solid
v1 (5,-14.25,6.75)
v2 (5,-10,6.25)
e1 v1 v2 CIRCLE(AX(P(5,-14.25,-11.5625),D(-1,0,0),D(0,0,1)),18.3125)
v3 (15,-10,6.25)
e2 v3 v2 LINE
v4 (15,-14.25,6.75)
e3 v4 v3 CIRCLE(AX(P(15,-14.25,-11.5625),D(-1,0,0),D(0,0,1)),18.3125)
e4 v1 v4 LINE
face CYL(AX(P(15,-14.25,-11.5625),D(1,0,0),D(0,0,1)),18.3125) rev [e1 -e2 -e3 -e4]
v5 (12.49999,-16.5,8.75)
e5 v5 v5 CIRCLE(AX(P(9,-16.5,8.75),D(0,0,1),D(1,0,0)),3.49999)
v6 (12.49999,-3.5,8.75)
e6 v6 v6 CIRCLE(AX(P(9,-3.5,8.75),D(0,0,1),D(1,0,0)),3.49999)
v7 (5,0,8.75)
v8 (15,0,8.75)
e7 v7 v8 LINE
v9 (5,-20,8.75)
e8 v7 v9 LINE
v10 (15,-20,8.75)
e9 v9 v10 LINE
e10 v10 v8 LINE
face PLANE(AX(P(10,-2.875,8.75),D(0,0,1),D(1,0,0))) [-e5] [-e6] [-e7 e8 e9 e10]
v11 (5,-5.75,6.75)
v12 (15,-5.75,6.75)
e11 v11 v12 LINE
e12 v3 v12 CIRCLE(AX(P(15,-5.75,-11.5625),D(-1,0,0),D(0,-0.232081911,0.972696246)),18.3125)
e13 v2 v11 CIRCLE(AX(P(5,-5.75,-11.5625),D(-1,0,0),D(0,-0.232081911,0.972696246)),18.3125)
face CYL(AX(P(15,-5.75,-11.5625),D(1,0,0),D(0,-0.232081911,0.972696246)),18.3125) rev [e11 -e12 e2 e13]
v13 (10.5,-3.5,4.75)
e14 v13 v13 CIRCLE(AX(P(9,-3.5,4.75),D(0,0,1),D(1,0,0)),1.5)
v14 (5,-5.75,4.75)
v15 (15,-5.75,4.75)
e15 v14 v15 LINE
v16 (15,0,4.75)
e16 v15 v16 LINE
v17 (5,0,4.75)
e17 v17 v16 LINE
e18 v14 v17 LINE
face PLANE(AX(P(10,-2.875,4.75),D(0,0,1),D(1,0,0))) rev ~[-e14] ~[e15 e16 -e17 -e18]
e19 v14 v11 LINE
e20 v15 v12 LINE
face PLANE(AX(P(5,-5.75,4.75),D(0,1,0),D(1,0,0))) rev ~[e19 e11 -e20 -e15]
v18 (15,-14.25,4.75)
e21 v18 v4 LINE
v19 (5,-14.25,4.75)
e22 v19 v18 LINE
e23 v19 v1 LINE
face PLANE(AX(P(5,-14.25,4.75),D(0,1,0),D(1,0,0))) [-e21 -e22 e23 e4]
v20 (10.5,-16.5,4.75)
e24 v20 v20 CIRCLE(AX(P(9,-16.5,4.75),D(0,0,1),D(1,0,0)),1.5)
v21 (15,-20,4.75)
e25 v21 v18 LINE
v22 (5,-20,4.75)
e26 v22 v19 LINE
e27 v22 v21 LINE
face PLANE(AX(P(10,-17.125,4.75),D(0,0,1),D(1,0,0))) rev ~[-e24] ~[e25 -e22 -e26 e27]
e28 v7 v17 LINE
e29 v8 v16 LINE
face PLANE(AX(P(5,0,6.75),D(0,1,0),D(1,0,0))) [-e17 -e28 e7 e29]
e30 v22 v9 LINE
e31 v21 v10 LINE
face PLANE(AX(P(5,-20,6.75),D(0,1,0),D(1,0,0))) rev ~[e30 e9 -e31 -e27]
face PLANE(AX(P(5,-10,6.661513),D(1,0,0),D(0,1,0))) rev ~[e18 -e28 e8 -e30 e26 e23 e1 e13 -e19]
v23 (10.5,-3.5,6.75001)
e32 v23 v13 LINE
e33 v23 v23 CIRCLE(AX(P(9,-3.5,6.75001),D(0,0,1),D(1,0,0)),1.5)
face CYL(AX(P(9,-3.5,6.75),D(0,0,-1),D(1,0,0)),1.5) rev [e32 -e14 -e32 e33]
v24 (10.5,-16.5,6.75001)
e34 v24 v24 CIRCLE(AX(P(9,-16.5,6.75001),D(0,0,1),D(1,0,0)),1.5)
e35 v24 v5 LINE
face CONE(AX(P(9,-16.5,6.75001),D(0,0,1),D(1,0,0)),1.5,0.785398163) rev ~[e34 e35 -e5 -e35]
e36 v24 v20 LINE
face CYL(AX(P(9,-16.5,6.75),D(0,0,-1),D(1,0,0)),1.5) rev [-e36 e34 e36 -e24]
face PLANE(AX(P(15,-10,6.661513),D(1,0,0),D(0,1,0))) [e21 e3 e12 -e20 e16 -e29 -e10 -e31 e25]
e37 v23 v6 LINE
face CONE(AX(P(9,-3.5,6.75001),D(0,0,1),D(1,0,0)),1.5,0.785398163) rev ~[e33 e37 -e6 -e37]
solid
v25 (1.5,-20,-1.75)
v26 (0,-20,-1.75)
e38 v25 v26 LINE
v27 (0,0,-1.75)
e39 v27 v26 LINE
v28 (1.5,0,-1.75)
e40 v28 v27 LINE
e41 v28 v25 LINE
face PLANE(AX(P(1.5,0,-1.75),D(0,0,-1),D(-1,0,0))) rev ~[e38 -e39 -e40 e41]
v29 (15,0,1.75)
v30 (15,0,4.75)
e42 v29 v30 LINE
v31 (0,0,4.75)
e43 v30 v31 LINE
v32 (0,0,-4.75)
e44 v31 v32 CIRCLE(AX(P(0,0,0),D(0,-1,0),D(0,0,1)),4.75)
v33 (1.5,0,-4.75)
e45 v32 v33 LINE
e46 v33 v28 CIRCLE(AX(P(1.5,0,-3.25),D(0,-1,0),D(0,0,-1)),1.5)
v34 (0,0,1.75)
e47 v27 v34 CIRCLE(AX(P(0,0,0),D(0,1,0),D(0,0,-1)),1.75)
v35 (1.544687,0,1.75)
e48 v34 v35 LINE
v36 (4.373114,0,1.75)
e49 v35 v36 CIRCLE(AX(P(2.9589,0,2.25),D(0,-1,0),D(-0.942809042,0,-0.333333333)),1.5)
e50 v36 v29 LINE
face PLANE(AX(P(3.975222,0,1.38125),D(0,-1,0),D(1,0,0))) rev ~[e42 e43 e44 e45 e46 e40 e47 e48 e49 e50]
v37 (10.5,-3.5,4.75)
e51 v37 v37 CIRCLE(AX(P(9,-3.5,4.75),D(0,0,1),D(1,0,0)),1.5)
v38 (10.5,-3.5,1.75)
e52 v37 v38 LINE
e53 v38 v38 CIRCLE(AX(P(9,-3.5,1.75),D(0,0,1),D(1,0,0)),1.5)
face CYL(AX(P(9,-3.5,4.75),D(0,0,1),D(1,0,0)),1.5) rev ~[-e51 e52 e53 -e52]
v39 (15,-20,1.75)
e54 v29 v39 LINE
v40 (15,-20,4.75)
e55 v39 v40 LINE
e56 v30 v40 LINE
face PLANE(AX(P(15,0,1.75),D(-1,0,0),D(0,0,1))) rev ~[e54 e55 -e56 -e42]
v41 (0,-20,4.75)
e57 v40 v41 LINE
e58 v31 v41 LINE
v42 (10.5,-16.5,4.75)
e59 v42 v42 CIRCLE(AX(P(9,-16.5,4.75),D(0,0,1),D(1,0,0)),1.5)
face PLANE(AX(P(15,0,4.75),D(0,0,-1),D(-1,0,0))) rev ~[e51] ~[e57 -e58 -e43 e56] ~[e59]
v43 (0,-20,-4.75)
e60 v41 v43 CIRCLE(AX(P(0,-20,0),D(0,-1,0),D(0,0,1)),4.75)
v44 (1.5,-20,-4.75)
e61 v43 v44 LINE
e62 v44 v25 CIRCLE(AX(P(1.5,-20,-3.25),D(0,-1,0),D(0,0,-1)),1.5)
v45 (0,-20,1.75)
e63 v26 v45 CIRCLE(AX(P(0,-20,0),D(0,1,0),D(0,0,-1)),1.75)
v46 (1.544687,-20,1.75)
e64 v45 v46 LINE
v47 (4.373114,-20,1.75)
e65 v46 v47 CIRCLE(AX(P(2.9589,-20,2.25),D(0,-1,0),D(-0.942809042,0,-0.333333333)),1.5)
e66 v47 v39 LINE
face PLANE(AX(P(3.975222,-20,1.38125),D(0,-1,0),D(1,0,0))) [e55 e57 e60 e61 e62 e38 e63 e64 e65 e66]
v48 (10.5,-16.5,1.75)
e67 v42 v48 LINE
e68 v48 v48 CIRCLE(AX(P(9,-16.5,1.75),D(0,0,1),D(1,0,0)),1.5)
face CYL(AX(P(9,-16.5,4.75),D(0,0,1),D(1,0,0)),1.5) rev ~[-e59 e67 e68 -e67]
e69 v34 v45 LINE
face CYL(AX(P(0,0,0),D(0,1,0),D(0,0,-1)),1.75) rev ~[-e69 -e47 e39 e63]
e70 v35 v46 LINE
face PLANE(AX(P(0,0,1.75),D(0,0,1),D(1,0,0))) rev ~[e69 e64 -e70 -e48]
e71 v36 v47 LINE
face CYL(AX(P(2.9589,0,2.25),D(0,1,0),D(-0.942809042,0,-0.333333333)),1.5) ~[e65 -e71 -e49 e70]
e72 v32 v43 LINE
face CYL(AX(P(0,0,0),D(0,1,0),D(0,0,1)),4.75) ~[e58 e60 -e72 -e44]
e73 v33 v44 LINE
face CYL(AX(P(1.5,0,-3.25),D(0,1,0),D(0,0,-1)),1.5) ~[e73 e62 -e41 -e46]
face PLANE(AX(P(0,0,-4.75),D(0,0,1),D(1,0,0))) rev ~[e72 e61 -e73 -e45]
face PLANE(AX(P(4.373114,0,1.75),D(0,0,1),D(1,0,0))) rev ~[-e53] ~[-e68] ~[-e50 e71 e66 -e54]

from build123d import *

# Parameters (mm, degrees)
F1_DEPTH  = 20
F2_R      = 1.5
F3_DEPTH  = 9.501
F4_W      = 10
F4_H      = 5.75
F4_R      = 1.5
F5_DEPTH  = 2
F6_W      = 10
F6_H      = 5.75
F6_R      = 1.5
F6_H_2    = 14.25
F7_DEPTH  = 2
F8_SIZE   = 1.99999
F10_DEPTH = 10


# Not quite as in the source:
# - a fillet or chamfer is up to 0.001 mm smaller than in the source, because OpenCascade refuses the exact size


with BuildPart() as f1:
    # F0 (on Front) → F1 (new body)
    with BuildSketch(Plane.XZ):
        with BuildLine():
            ThreePointArc((0, -1.75), (-1.75, 0), (0, 1.75))
            Line((0, 1.75), (1.5446865, 1.75))
            Line((1.5446865, 1.75), (4.3731136247, 1.75))
            Line((4.3731136247, 1.75), (15, 1.75))
            Line((15, 1.75), (15, 4.75))
            Line((15, 4.75), (0, 4.75))
            ThreePointArc((0, 4.75), (-4.75, 0), (0, -4.75))
            Line((0, -4.75), (1.5, -4.75))
            ThreePointArc((1.5, -4.75), (3, -3.25), (1.5, -1.75))
            Line((1.5, -1.75), (0, -1.75))
        make_face()
        with BuildLine():
            Line((4.3731136247, 1.75), (1.5446865, 1.75))
            ThreePointArc((1.5446865, 1.75), (2.9589000624, 0.75), (4.3731136247, 1.75))
        make_face()
    extrude(amount=F1_DEPTH)

    # F2 (on face) → F3 (cut, through all)
    with BuildSketch(Plane.XY.offset(4.75)):
        with Locations((9, -3.5)):
            Circle(F2_R)
        with Locations((9, -16.5)):
            Circle(F2_R)
    extrude(amount=-F3_DEPTH, mode=Mode.SUBTRACT)


with BuildPart() as f5:
    # F4 (on face) → F5 (new body)
    with BuildSketch(Plane.XY.offset(4.75)):
        with Locations((10, -2.875)):
            Rectangle(F4_W, F4_H)
        with Locations((9, -3.5)):
            Circle(F4_R, mode=Mode.SUBTRACT)
    extrude(amount=F5_DEPTH)



with BuildPart() as f5b:
    # F4 (on face) → F5, piece 2 (new body)
    with BuildSketch(Plane.XY.offset(4.75)):
        with Locations((10, -17.125)):
            Rectangle(F4_W, F4_H)
        with Locations((9, -16.5)):
            Circle(F4_R, mode=Mode.SUBTRACT)
    extrude(amount=F5_DEPTH)


with BuildPart() as f5_1:
    add(f5.part)

    add(f5b.part)  # F7 merges F5b
    # F6 (on face) → F7 (join)
    with BuildSketch(Plane.XY.offset(6.75)):
        with Locations((10, -2.875)):
            Rectangle(F6_W, F6_H)
        with Locations((9, -3.5)):
            Circle(F6_R, mode=Mode.SUBTRACT)
        with Locations((10, -12.875)):
            Rectangle(F6_W, F6_H_2)
        with Locations((9, -16.5)):
            Circle(F6_R, mode=Mode.SUBTRACT)
    extrude(amount=F7_DEPTH)

    # F8 (size 2 in the source; OpenCascade refuses exactly that, so slightly less here)
    f8_edges = [f5_1.edges().sort_by_distance(p)[0] for p in [
        (7.5, -16.5, 8.75),
        (7.5, -3.5, 8.75),
    ]]
    chamfer(f8_edges, length=F8_SIZE)

    # F9 (on face) → F10 (join, through all)
    with BuildSketch(Plane.YZ.offset(15)):
        with BuildLine():
            Line((-5.75, 6.75), (-14.25, 6.75))
            ThreePointArc((-14.25, 6.75), (-12.1103446539, 6.6245704417), (-10, 6.25))
            ThreePointArc((-10, 6.25), (-7.8896553461, 6.6245704417), (-5.75, 6.75))
        make_face()
    extrude(amount=-F10_DEPTH)


solid = Compound([f1.part, f5_1.part])
